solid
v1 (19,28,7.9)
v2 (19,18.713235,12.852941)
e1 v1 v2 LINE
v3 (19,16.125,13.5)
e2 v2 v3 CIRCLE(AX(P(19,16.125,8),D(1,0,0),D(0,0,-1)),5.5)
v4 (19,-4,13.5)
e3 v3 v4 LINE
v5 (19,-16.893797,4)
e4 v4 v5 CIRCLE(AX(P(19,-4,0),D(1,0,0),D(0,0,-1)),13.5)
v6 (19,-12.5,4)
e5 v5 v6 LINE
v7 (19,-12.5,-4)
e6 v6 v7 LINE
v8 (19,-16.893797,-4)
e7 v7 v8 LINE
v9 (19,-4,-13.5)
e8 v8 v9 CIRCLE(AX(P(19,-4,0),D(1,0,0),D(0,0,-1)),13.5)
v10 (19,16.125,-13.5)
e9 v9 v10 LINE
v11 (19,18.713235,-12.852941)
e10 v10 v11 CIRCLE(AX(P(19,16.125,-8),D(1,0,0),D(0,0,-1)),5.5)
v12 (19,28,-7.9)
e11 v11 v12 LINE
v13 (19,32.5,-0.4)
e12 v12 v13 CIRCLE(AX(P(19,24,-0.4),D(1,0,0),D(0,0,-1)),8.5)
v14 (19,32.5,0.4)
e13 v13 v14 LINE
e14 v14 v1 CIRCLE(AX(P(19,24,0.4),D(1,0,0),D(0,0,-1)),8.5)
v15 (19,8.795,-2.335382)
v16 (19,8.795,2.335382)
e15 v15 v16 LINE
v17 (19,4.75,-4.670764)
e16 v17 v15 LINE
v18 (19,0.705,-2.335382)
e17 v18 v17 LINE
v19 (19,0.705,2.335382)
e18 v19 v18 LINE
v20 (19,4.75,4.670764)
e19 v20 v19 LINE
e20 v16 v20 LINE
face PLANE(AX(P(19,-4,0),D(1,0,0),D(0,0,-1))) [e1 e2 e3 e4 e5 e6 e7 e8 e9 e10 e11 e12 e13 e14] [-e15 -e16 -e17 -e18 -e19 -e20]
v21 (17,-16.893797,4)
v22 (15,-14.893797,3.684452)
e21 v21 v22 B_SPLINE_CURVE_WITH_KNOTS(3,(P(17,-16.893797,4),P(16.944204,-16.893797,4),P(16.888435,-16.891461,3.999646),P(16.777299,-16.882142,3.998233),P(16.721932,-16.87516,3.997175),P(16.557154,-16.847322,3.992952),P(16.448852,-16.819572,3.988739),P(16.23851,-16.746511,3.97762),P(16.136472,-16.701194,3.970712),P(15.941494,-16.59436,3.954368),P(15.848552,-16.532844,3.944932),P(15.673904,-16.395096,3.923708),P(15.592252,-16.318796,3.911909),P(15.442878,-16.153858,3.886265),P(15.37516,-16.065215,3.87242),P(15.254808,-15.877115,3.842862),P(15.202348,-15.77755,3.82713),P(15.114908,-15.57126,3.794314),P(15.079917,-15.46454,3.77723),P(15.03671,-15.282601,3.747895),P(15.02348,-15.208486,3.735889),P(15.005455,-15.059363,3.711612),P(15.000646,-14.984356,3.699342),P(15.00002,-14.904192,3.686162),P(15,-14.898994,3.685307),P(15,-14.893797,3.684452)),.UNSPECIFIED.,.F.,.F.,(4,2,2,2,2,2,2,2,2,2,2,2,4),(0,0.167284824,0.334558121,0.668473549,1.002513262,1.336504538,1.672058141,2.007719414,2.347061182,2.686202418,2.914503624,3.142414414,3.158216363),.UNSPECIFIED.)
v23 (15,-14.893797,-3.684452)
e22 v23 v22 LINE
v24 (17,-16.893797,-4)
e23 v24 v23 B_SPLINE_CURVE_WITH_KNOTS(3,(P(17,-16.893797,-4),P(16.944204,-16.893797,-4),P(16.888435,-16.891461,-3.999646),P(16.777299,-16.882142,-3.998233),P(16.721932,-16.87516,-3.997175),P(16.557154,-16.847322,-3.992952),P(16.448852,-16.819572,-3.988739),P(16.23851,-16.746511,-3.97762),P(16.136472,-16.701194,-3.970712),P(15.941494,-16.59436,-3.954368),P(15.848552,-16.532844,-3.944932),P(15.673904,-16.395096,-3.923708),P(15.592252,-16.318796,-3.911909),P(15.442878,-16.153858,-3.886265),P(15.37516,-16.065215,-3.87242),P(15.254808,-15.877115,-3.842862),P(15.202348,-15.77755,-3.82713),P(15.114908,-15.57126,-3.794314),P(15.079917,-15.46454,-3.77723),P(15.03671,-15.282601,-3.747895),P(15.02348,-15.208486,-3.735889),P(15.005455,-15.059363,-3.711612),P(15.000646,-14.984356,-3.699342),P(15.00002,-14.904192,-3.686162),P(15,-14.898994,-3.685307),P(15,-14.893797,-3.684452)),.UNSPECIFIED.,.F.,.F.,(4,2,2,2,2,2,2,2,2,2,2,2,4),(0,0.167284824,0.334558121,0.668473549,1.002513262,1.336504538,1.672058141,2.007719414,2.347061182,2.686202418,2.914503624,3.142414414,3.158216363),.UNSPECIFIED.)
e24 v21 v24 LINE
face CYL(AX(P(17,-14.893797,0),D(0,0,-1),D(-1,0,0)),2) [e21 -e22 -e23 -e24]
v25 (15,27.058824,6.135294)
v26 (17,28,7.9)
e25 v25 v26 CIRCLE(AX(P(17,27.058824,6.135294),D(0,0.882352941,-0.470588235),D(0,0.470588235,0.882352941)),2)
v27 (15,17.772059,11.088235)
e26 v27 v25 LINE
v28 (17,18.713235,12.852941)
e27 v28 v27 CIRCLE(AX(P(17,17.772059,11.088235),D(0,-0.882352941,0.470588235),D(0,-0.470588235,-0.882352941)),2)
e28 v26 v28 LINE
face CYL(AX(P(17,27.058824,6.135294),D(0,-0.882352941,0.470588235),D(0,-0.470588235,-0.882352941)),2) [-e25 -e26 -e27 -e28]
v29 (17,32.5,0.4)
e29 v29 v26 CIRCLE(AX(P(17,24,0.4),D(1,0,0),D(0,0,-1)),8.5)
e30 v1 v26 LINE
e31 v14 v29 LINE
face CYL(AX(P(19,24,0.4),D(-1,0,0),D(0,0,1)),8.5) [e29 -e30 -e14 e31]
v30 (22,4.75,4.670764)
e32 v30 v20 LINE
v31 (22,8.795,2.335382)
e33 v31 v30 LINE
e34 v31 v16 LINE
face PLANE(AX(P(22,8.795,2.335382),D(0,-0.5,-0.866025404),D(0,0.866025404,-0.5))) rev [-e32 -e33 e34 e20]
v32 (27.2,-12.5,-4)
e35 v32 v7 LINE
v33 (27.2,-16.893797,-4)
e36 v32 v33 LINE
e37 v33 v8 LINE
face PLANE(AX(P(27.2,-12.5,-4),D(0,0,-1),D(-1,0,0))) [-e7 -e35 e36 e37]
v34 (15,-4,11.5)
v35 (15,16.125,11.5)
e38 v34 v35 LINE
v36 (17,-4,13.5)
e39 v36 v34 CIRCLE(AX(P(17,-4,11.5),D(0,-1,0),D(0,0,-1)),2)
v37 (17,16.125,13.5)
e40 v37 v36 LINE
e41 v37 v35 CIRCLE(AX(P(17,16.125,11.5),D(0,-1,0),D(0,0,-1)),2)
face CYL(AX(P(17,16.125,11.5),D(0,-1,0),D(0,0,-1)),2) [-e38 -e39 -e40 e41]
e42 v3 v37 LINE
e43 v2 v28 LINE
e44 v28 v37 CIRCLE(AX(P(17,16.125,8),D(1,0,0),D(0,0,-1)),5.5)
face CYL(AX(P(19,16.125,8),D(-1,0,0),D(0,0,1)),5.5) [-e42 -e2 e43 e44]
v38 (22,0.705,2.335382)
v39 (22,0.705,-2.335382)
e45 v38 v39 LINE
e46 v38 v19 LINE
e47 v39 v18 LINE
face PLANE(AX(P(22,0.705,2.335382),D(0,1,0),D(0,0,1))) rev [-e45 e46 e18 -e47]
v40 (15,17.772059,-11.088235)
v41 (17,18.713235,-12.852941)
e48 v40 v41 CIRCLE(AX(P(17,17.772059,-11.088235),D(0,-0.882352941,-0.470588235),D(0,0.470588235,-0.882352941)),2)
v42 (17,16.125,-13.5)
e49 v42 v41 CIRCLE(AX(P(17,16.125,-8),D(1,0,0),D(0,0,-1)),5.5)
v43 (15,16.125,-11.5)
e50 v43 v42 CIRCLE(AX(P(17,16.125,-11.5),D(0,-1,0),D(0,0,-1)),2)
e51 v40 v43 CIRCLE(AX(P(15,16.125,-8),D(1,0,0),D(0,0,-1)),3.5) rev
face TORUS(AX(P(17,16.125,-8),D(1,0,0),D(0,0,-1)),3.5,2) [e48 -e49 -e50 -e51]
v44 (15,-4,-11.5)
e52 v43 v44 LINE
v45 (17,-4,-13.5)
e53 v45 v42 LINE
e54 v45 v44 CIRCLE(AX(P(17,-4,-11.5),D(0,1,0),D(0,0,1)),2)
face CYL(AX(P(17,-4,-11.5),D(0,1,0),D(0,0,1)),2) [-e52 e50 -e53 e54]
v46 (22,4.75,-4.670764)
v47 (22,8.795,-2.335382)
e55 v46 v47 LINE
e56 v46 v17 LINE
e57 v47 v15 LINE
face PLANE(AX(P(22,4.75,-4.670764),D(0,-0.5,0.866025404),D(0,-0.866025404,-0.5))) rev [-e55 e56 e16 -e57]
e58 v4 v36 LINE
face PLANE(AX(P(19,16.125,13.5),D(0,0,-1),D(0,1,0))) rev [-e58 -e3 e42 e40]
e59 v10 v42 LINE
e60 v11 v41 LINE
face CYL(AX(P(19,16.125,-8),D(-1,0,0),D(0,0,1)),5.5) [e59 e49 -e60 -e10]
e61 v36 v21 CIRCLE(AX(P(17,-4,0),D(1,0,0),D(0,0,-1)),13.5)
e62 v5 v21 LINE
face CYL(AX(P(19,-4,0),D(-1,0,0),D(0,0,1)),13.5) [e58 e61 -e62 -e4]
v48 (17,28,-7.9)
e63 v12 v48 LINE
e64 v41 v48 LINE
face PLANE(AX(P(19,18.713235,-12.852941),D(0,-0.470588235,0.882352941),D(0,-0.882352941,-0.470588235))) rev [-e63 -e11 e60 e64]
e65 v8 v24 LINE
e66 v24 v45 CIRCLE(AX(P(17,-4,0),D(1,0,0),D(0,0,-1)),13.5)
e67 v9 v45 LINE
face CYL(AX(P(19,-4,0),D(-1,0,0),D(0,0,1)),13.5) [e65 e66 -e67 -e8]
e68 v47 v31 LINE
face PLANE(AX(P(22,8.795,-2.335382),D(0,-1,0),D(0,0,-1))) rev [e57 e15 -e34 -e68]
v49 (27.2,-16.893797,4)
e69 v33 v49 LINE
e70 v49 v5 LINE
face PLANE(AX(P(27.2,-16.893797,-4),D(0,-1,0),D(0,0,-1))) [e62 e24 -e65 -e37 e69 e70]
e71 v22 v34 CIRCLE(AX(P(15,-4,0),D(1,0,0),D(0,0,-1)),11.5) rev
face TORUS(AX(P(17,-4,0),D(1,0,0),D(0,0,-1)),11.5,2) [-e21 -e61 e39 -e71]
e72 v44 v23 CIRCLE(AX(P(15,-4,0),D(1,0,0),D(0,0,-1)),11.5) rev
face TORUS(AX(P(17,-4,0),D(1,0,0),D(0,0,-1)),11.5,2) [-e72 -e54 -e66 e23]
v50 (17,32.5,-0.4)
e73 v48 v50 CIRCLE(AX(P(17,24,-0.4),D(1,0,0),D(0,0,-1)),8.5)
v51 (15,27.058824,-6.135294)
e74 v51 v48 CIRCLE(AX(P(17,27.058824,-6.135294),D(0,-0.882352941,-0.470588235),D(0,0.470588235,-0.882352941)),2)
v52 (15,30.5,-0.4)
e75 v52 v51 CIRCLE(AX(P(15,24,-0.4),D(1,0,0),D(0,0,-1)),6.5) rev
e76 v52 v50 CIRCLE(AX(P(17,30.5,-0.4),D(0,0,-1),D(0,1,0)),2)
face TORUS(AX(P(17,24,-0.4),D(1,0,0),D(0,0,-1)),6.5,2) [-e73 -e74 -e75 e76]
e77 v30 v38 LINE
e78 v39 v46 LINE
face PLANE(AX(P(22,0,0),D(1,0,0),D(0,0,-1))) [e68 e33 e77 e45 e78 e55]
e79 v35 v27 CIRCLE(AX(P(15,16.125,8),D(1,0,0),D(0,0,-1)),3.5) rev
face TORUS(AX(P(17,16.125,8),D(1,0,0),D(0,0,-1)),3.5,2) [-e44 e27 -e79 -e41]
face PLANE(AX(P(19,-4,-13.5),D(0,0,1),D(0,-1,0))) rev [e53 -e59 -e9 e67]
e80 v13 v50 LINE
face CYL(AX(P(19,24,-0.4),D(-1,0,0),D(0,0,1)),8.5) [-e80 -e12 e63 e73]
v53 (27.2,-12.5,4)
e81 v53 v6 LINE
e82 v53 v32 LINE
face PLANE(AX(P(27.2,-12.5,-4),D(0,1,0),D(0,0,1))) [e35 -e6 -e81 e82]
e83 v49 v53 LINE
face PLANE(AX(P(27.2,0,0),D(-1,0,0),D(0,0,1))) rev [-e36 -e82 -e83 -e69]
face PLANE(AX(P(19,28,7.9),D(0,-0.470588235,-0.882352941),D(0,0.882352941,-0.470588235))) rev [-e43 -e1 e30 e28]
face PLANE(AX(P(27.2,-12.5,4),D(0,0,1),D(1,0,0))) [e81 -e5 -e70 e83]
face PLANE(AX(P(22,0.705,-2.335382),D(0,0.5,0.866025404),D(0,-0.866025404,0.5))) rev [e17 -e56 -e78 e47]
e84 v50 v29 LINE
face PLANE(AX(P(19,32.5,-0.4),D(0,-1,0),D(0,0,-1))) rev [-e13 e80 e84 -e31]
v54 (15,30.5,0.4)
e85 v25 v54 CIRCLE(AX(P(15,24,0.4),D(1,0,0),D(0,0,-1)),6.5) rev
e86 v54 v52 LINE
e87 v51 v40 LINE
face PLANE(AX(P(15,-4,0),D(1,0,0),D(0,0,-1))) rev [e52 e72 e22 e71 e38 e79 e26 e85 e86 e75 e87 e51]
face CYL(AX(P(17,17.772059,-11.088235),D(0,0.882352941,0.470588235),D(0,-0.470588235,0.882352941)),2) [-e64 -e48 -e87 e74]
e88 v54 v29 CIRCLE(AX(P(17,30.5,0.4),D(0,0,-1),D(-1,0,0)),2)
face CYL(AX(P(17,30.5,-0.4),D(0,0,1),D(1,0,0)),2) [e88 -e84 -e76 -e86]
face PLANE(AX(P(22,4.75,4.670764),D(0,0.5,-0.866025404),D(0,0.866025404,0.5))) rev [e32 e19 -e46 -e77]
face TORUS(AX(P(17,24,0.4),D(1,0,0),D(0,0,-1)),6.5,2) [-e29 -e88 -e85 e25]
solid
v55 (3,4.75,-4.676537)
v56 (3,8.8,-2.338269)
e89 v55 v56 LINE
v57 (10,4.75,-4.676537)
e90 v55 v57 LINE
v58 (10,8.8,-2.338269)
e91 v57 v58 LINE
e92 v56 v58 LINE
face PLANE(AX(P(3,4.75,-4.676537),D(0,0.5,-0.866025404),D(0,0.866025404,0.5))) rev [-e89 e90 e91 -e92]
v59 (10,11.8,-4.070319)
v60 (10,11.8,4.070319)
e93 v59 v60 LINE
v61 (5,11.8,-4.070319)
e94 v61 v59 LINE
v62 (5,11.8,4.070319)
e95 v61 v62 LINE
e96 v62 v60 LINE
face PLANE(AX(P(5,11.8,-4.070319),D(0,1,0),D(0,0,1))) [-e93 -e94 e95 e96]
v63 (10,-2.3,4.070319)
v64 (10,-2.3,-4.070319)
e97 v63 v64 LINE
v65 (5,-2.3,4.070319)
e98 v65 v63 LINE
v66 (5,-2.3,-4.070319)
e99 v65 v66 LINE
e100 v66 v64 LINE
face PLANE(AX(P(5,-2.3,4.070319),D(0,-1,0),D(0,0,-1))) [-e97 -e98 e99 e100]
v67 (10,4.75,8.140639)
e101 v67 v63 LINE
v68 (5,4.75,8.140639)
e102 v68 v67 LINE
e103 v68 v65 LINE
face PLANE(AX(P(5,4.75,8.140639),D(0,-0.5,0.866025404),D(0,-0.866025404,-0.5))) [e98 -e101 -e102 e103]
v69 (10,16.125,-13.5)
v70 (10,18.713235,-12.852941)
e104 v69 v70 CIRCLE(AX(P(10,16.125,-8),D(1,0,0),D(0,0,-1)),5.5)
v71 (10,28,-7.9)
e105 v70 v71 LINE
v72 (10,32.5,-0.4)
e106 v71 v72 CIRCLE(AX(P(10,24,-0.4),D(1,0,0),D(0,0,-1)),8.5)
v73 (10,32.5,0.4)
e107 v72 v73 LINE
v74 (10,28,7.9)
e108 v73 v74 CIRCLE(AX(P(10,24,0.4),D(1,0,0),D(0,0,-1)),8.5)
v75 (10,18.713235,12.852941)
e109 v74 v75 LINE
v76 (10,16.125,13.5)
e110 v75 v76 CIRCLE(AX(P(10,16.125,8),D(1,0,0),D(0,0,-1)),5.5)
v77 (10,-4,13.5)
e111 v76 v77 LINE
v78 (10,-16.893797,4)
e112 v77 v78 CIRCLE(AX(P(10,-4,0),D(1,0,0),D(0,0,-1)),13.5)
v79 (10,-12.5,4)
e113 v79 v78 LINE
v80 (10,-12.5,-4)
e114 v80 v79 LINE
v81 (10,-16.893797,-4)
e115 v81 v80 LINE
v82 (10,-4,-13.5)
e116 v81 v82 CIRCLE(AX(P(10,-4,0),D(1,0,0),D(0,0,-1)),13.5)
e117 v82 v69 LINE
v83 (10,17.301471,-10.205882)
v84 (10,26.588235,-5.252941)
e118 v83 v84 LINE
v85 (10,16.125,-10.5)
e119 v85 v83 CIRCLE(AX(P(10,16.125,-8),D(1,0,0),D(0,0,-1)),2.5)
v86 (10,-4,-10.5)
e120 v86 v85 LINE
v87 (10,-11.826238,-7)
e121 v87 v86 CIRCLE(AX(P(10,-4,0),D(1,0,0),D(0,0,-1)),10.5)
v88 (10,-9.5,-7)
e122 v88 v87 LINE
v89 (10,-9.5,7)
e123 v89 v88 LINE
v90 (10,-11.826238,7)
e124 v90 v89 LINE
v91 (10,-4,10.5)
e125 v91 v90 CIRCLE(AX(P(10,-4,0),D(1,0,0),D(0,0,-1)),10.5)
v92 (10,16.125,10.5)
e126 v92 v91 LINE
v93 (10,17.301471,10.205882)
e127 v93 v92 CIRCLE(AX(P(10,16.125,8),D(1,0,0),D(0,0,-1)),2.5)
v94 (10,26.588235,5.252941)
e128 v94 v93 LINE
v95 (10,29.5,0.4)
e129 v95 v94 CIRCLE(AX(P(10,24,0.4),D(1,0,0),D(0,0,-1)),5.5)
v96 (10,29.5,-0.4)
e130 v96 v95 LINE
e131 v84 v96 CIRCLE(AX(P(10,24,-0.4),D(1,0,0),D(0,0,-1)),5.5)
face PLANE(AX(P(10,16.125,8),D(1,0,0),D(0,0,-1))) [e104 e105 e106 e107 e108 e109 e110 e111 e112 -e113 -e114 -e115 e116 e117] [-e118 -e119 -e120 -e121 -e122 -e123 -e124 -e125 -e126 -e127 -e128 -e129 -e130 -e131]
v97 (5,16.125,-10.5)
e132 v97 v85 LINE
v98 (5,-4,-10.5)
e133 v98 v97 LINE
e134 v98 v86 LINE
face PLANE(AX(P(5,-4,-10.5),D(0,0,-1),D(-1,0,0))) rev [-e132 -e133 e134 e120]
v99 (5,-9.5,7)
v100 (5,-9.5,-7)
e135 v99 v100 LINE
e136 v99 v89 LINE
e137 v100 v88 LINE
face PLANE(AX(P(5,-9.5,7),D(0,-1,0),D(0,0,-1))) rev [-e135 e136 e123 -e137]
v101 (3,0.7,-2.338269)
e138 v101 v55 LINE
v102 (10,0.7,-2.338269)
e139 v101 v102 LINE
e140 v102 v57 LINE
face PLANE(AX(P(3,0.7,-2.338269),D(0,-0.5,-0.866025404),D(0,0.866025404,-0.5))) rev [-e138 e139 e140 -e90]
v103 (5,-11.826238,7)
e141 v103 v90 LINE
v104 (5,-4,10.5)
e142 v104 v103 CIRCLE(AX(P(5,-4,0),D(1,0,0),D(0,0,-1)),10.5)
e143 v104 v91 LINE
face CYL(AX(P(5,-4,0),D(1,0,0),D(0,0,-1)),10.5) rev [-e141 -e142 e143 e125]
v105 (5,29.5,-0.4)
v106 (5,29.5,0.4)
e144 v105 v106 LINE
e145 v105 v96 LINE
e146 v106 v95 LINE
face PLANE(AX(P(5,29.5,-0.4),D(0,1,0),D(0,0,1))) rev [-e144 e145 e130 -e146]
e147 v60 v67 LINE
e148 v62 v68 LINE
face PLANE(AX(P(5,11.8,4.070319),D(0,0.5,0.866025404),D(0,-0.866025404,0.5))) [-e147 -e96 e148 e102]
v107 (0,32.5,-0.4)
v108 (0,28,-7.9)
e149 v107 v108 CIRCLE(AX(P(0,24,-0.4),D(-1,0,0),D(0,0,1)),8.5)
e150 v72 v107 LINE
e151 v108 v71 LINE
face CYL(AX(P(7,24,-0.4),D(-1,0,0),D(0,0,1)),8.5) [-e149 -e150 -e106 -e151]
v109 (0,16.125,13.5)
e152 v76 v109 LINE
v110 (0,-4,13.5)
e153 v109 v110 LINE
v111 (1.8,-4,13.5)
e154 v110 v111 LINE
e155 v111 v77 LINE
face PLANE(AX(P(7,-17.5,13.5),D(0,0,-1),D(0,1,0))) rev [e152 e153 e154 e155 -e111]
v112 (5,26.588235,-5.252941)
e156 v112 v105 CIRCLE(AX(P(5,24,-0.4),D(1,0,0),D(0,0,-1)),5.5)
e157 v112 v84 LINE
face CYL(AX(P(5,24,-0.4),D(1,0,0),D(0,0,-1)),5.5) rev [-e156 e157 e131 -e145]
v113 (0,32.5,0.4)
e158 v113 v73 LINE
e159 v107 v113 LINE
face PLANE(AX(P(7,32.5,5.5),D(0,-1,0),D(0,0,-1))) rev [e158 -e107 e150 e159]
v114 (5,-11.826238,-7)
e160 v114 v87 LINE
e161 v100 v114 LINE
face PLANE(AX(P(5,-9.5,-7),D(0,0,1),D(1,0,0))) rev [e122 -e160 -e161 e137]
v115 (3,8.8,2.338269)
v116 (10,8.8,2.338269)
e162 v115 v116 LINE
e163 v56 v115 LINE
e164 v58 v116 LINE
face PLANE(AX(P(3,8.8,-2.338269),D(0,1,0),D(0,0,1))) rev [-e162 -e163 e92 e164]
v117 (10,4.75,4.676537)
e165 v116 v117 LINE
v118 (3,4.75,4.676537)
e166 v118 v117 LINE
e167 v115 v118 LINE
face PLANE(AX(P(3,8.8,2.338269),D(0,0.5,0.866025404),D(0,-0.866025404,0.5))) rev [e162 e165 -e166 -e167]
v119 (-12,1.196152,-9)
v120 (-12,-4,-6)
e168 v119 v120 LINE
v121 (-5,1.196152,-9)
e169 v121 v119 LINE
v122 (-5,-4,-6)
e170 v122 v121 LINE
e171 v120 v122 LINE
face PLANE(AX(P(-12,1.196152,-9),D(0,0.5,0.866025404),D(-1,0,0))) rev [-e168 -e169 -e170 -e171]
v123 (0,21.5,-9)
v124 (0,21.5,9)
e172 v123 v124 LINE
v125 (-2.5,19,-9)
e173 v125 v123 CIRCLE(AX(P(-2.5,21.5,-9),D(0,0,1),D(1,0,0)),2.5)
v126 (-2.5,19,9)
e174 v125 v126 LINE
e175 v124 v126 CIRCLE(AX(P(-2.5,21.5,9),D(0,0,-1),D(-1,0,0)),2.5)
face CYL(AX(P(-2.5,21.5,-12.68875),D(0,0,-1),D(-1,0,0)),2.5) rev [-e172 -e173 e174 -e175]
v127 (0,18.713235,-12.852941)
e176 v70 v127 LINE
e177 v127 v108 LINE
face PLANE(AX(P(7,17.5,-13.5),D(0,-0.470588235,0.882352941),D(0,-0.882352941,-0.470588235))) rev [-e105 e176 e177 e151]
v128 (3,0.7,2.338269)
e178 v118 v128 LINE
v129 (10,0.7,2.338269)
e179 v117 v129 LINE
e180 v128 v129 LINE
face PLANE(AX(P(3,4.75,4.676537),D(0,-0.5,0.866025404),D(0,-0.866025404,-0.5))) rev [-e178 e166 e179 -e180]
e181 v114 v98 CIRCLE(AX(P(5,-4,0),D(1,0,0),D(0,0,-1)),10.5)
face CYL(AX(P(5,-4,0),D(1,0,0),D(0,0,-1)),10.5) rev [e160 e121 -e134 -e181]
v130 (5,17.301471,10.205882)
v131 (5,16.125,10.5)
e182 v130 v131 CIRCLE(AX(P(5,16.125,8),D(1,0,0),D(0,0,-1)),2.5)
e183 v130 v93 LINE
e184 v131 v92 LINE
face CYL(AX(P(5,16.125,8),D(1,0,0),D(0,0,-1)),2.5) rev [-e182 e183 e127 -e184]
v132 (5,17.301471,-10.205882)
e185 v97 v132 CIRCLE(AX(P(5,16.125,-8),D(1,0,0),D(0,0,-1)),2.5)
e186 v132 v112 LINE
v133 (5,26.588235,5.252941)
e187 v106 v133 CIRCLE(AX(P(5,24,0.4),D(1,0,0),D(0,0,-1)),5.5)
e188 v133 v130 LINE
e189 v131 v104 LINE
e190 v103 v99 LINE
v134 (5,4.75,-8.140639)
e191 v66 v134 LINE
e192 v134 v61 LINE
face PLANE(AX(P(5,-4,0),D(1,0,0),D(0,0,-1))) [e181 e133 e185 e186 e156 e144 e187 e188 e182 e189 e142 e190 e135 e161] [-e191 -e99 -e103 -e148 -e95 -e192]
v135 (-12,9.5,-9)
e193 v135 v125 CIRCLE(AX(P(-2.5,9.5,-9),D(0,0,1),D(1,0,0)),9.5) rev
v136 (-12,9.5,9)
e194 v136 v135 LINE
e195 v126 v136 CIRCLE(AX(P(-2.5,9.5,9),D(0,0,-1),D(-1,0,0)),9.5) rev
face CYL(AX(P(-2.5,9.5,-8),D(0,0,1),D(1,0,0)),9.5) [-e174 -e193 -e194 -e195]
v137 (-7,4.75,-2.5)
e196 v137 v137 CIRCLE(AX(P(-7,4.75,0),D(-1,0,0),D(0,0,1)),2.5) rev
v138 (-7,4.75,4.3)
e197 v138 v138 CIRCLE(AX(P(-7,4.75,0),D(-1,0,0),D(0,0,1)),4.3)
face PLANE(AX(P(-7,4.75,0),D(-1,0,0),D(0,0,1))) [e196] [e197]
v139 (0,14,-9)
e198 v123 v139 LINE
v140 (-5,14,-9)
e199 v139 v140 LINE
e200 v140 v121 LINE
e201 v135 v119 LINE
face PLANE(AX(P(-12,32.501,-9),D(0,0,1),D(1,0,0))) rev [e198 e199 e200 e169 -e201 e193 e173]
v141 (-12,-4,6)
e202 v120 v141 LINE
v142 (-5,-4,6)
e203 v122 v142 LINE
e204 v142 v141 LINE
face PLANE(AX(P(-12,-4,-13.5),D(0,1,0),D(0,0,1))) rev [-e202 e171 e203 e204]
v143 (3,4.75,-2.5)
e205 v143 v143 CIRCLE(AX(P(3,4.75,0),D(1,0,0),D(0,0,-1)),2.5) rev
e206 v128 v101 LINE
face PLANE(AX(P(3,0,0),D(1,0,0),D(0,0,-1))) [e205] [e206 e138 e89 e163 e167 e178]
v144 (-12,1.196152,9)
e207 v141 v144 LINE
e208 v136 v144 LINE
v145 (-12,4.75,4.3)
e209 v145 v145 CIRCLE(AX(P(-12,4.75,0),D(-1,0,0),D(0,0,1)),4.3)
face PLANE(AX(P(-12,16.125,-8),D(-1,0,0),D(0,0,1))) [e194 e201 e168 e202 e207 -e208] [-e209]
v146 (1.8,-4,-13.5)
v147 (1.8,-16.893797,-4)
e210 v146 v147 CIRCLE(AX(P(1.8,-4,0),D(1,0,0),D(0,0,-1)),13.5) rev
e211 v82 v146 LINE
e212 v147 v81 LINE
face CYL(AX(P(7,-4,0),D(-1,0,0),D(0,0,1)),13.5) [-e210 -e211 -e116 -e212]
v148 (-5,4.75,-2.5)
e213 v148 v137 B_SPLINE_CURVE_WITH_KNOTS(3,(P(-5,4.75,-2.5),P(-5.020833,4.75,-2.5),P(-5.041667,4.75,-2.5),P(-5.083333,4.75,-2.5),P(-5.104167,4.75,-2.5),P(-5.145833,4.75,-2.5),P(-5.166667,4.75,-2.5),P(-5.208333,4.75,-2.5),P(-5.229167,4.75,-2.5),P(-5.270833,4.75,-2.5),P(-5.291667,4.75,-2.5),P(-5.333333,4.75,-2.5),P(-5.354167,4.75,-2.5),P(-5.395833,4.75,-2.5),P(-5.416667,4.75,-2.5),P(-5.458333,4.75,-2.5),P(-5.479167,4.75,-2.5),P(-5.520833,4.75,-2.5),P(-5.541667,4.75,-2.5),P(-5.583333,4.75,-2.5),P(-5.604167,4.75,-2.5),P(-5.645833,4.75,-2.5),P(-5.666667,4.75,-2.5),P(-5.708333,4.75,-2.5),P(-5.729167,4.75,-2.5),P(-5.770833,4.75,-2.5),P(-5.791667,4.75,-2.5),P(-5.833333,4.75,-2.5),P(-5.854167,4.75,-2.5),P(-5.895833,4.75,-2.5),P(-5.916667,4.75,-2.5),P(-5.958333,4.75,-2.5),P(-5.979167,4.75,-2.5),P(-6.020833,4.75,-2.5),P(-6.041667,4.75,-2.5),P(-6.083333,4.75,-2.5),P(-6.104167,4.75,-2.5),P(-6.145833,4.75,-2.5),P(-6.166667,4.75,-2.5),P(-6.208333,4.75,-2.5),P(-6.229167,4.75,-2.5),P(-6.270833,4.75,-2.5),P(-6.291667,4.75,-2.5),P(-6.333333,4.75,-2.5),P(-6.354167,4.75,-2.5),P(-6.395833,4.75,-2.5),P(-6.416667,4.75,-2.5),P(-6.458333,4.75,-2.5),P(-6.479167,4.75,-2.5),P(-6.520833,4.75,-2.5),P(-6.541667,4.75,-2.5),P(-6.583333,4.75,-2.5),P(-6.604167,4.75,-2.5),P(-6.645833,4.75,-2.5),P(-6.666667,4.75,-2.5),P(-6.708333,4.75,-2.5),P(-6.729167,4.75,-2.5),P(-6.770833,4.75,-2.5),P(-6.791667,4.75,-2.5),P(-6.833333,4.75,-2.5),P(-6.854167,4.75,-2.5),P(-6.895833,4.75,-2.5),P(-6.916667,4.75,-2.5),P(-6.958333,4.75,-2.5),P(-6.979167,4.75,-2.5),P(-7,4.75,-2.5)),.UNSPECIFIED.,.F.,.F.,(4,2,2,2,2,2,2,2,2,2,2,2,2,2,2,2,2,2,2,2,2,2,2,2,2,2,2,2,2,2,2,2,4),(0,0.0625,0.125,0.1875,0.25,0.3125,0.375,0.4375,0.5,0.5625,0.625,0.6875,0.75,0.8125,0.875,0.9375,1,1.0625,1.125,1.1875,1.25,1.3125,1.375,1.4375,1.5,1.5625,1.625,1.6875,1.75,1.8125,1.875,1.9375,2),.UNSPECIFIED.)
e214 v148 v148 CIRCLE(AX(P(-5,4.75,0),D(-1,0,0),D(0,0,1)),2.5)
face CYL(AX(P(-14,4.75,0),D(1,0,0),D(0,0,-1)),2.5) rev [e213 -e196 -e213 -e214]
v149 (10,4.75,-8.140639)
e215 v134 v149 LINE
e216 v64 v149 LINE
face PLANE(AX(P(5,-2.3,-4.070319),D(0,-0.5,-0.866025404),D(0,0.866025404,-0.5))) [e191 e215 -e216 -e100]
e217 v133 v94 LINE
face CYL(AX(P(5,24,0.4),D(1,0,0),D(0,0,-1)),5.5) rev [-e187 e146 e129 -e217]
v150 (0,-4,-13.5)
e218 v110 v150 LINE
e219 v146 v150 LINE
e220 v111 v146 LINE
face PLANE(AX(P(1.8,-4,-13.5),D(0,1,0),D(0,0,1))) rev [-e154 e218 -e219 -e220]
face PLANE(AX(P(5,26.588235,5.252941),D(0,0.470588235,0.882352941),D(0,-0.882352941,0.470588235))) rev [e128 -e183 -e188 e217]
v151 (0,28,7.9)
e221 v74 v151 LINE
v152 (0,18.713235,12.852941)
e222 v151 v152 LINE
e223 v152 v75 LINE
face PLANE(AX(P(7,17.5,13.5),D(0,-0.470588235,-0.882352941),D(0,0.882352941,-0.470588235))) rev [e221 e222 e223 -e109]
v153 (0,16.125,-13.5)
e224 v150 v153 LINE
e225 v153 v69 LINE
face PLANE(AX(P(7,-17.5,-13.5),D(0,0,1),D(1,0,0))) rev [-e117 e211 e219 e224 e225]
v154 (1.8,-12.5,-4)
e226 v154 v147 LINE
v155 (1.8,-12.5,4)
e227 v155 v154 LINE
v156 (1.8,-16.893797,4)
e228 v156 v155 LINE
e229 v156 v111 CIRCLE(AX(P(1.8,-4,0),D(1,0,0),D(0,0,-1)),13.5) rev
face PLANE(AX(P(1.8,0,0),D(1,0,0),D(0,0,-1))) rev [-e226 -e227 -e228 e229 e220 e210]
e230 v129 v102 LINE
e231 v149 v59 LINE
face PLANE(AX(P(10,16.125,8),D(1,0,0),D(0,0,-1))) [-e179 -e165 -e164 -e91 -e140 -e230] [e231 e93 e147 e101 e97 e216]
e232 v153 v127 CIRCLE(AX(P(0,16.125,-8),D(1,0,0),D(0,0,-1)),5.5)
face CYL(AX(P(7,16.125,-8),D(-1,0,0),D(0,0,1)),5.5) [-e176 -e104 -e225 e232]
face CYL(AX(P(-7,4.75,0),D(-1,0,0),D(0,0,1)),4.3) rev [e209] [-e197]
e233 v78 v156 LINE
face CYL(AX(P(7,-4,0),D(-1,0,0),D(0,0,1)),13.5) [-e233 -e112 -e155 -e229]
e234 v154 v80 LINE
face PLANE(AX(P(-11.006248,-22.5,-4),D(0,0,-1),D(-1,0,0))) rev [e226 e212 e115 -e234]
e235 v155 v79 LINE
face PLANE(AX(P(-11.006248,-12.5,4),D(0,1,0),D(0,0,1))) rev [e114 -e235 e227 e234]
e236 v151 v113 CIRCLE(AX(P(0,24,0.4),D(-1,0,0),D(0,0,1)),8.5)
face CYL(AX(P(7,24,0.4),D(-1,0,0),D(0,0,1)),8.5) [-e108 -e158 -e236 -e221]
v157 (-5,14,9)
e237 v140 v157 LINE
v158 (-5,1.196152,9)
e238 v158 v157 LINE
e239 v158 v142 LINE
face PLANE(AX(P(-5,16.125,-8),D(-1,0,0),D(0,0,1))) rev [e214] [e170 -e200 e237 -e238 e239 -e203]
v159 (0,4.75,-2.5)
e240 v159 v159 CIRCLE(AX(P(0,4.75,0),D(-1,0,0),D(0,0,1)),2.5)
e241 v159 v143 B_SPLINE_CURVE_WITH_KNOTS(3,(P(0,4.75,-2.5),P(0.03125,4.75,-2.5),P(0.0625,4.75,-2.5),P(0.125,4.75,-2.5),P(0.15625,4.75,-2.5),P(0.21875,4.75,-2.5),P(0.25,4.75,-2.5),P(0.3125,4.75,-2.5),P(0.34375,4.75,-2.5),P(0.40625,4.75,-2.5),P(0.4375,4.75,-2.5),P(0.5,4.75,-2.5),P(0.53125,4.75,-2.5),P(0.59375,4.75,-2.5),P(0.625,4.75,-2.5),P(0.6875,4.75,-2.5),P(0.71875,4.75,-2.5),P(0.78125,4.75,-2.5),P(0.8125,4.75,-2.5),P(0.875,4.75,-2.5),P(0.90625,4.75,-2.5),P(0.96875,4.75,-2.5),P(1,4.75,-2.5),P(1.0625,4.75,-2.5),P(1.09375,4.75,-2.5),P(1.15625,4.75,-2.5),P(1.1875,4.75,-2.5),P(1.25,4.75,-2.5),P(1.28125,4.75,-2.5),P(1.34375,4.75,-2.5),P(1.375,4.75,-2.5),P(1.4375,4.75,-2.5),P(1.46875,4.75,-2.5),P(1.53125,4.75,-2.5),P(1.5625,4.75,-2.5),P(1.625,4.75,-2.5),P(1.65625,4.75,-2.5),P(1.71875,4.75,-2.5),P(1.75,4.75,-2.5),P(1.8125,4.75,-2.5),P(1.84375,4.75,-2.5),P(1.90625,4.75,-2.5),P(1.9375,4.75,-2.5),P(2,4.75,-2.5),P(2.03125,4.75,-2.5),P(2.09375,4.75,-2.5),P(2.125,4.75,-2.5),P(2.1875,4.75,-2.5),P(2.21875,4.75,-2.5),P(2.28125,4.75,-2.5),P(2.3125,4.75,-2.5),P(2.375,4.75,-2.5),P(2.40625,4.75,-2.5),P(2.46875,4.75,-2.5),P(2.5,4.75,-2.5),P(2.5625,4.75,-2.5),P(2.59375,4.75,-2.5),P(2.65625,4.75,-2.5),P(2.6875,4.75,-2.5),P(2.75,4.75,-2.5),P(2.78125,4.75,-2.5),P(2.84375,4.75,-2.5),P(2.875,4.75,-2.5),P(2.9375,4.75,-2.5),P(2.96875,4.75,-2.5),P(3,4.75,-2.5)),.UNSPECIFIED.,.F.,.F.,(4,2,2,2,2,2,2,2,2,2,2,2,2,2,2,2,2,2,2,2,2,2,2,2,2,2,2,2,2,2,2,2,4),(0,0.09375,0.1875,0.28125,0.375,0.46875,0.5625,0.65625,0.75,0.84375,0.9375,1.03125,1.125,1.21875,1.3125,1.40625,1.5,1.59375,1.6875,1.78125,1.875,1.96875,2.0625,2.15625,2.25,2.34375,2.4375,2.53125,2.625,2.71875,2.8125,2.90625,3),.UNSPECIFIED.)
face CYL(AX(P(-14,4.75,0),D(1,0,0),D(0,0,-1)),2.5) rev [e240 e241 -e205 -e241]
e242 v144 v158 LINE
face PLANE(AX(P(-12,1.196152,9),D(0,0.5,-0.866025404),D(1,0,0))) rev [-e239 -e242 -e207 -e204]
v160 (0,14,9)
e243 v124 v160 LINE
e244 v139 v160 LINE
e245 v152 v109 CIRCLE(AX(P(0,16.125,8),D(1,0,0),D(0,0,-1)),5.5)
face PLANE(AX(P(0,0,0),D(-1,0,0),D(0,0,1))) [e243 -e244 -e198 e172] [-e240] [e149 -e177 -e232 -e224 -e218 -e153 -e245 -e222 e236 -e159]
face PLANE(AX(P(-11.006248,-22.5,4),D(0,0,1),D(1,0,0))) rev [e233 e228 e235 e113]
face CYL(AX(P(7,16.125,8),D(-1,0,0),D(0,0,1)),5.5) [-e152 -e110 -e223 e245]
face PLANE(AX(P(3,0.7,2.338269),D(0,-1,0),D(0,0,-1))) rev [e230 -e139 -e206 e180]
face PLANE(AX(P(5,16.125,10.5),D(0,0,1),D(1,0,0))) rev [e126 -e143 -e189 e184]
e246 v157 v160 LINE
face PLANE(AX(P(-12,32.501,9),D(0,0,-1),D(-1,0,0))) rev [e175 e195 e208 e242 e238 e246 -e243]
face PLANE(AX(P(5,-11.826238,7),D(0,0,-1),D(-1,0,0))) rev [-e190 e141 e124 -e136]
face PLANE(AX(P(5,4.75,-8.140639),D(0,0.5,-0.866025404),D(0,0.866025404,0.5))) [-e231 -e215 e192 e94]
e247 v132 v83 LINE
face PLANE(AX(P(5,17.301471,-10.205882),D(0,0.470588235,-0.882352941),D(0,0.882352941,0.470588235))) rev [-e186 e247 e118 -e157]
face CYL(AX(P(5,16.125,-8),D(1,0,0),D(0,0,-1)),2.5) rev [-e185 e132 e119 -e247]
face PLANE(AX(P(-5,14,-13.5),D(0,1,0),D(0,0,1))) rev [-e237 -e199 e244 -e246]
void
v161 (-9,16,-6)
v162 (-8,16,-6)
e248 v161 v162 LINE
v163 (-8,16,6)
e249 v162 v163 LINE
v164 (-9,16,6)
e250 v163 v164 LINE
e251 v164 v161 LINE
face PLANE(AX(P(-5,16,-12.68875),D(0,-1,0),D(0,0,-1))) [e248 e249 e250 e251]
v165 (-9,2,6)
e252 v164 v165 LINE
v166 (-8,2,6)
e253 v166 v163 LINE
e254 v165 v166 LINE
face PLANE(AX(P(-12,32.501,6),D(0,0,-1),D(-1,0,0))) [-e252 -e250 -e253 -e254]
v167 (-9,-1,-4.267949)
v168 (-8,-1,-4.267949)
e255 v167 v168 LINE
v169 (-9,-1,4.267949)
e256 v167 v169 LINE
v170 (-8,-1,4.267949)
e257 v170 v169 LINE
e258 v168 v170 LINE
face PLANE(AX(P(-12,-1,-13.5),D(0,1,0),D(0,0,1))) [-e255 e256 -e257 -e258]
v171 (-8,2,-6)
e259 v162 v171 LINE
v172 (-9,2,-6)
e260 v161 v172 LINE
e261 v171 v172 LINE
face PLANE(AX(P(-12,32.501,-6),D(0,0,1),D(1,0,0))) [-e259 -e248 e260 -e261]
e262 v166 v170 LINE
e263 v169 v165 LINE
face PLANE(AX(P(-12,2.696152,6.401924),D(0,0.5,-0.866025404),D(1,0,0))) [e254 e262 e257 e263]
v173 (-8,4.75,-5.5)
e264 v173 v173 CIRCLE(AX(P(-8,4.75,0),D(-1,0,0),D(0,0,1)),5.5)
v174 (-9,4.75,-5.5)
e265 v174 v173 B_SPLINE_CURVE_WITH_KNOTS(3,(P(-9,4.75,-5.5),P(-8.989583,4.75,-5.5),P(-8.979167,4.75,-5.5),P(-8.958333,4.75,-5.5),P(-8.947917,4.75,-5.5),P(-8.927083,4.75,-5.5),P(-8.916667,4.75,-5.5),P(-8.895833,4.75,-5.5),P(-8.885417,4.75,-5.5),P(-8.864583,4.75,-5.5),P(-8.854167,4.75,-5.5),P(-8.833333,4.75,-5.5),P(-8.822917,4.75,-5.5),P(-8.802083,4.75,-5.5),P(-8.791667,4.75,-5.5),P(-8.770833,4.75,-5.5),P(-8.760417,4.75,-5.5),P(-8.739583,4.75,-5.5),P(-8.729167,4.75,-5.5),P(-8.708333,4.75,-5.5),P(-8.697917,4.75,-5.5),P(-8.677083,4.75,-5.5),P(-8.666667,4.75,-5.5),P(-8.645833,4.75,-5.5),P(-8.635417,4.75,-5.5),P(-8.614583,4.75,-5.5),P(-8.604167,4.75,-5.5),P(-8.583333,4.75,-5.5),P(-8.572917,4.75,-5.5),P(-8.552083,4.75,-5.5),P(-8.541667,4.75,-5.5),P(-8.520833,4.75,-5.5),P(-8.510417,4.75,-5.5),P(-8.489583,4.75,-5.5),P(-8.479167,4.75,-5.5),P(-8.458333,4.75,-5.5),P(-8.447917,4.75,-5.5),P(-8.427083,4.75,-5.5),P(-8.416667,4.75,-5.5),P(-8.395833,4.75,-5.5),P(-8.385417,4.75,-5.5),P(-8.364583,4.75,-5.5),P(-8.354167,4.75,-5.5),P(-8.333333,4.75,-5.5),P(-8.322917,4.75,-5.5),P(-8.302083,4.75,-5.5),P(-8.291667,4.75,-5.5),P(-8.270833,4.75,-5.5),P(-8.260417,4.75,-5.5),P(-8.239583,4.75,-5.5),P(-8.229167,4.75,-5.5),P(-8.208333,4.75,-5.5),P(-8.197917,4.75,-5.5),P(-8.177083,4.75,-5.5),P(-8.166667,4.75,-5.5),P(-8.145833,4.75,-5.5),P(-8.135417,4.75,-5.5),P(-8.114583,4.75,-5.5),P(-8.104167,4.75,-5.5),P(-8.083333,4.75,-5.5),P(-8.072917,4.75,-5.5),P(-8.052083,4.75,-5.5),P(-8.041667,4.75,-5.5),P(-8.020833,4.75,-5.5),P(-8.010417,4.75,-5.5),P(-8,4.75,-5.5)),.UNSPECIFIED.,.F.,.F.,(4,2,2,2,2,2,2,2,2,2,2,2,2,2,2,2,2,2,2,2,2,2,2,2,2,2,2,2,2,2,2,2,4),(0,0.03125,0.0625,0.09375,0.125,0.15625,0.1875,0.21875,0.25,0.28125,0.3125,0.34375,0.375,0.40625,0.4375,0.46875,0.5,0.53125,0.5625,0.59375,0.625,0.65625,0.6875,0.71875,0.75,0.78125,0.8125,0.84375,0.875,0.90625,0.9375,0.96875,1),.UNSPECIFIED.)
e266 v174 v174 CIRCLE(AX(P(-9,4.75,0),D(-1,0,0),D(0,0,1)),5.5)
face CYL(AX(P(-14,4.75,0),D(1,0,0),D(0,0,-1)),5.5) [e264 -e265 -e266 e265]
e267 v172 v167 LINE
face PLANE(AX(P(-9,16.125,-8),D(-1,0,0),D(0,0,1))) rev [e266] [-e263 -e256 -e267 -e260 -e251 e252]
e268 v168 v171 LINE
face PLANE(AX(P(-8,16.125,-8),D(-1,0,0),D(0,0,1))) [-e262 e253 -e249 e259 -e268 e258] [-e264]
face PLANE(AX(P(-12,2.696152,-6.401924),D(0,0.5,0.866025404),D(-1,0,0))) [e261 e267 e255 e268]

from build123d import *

# Parameters (mm, degrees)
BOSS_EXTRUDE1_DEPTH = 7
FILLET1_R           = 8.5
FILLET2_R           = 5.5
FILLET3_R           = 13.5
SKETCH3_W           = 27
SKETCH3_H           = 13.5
CUT_EXTRUDE1_DEPTH  = 1.8
BOSS_EXTRUDE2_DEPTH = 5
BOSS_EXTRUDE3_DEPTH = 7
SKETCH10_R          = 2.5
CUT_EXTRUDE3_DEPTH  = 21
CUT_EXTRUDE16_REACH = 42.725
SKETCH19_W          = 12
SKETCH19_H          = 4.5
CHAMFER5_SIZE       = 3
CHAMFER5_SIZE2      = 5.196152423
CUT_EXTRUDE17_DEPTH = 4
SHELL1_START        = -9
SHELL1_OUTLINE_R    = 5.5
SHELL1_DEPTH        = 1
SKETCH21_R          = 4.3
CUT_EXTRUDE18_DEPTH = 5
FILLET5_R           = 9.5
FILLET6_R           = 2.5
BOSS_EXTRUDE5_START = 3
BOSS_EXTRUDE5_DEPTH = 3
SKETCH24_W          = 8
SKETCH24_H          = 10
CUT_EXTRUDE19_DEPTH = 8.2
CUT_EXTRUDE20_DEPTH = 5
BOSS_EXTRUDE6_DEPTH = 4
SKETCH27_W          = 8
SKETCH27_H          = 4.393796958
BOSS_EXTRUDE8_DEPTH = 12.2
BOSS_EXTRUDE9_DEPTH = 3
FILLET8_R           = 2


# Read off the part's stored shape, not the designer's step: Shell1
# Some blends are built 0.0001 mm under size
with BuildPart() as part:
    # Sketch2 → Boss-Extrude1 (new body)
    with BuildSketch(Plane(origin=(0, 0, 0), x_dir=(0, 0, -1), z_dir=(1, 0, 0))):
        Polygon((-13.5, -17.5), (13.5, -17.5), (13.5, 17.5), (5.5, 32.5), (-5.5, 32.5), (-13.5, 17.5), align=None)
    extrude(amount=BOSS_EXTRUDE1_DEPTH)

    # Fillet1
    fillet1_edges = [part.edges().sort_by_distance(p)[0] for p in [
        (3.5, 32.5, 5.5),
        (3.5, 32.5, -5.5),
    ]]
    fillet(fillet1_edges, radius=FILLET1_R)

    # Fillet2
    fillet2_edges = [part.edges().sort_by_distance(p)[0] for p in [
        (3.5, 17.5, -13.5),
        (3.5, 17.5, 13.5),
    ]]
    fillet(fillet2_edges, radius=FILLET2_R)

    # Fillet3
    fillet3_edges = [part.edges().sort_by_distance(p)[0] for p in [
        (3.5, -17.5, 13.5),
        (3.5, -17.5, -13.5),
    ]]
    fillet(fillet3_edges, radius=FILLET3_R - 0.0001)  # a hair under: the kernel refuses the full size

    # Sketch3 → Cut-Extrude1 (cut)
    with BuildSketch(Plane.ZY):
        with Locations((0, -10.75)):
            Rectangle(SKETCH3_W, SKETCH3_H)
    extrude(amount=-CUT_EXTRUDE1_DEPTH, mode=Mode.SUBTRACT)

    # Sketch6 → Boss-Extrude2 (add)
    with BuildSketch(Plane.ZY):
        with BuildLine():
            Line((-13.5, 14), (13.5, 14))
            Line((13.5, 14), (13.5, 16.125))
            ThreePointArc((13.5, 16.125), (13.293303509, 17.618632471), (12.688749833, 19))
            Line((12.688749833, 19), (-12.688749833, 19))
            ThreePointArc((-12.688749833, 19), (-13.293303509, 17.618632471), (-13.5, 16.125))
            Line((-13.5, 16.125), (-13.5, 14))
        make_face()
    extrude(amount=BOSS_EXTRUDE2_DEPTH)

    # Sketch9 → Boss-Extrude3 (add)
    with BuildSketch(Plane.ZY.offset(5)):
        with BuildLine():
            Line((-13.5, 14), (-13.5, -4))
            Line((-13.5, -4), (13.5, -4))
            Line((13.5, -4), (13.5, 14))
            Line((13.5, 14), (13.5, 16.125))
            ThreePointArc((13.5, 16.125), (13.293303509, 17.618632471), (12.688749833, 19))
            Line((12.688749833, 19), (-12.688749833, 19))
            ThreePointArc((-12.688749833, 19), (-13.293303509, 17.618632471), (-13.5, 16.125))
            Line((-13.5, 16.125), (-13.5, 14))
        make_face()
    extrude(amount=BOSS_EXTRUDE3_DEPTH)

    # Sketch10 → Cut-Extrude3 (cut)
    with BuildSketch(Plane(origin=(7, 0, 0), x_dir=(0, 0, -1), z_dir=(1, 0, 0))):
        with Locations((0, 4.75)):
            Circle(SKETCH10_R)
    extrude(amount=-CUT_EXTRUDE3_DEPTH, mode=Mode.SUBTRACT)

    # Sketch19 → Cut-Extrude16 (cut, up to next)
    with BuildSketch(Plane.XZ.offset(4), mode=Mode.PRIVATE) as cut_extrude16_sk1:
        with Locations((-6, -11.25)):
            Rectangle(SKETCH19_W, SKETCH19_H)
    cut_extrude16_tool1 = extrude(cut_extrude16_sk1.sketch, amount=-CUT_EXTRUDE16_REACH, mode=Mode.PRIVATE) & part.part
    # Sketch19 → Cut-Extrude16 (cut, up to next)
    with BuildSketch(Plane.XZ.offset(4), mode=Mode.PRIVATE) as cut_extrude16_sk2:
        with Locations((-6, 11.25)):
            Rectangle(SKETCH19_W, SKETCH19_H)
    cut_extrude16_tool2 = extrude(cut_extrude16_sk2.sketch, amount=-CUT_EXTRUDE16_REACH, mode=Mode.PRIVATE) & part.part
    add(cut_extrude16_tool1.solids().sort_by_distance((-6, -4, -11.25))[0], mode=Mode.SUBTRACT)
    add(cut_extrude16_tool2.solids().sort_by_distance((-6, -4, 11.25))[0], mode=Mode.SUBTRACT)

    # Chamfer5
    chamfer5_edges = [part.edges().sort_by_distance(p)[0] for p in [
        (-8.5, -4, -9),
        (-8.5, -4, 9),
    ]]
    chamfer5_side = [part.faces().sort_by_distance(p)[0] for p in [
        (-8.5, -4, 0),
    ]]
    chamfer(chamfer5_edges, length=CHAMFER5_SIZE, length2=CHAMFER5_SIZE2, reference=chamfer5_side[0])

    # Sketch20 → Cut-Extrude17 (cut)
    with BuildSketch(Plane(origin=(7, 0, 0), x_dir=(0, 0, -1), z_dir=(1, 0, 0))):
        Polygon((2.33826859, 8.8), (-2.33826859, 8.8), (-4.67653718, 4.75), (-2.33826859, 0.7), (2.33826859, 0.7), (4.67653718, 4.75), align=None)
    extrude(amount=-CUT_EXTRUDE17_DEPTH, mode=Mode.SUBTRACT)

    # Shell1 outline → Shell1 (cut)
    with BuildSketch(Plane.YZ.offset(SHELL1_START)):
        Polygon((16, -6), (16, 6), (2, 6), (-1, 4.267949192), (-1, -4.267949192), (2, -6), align=None)
        with Locations((4.75, 0)):
            Circle(SHELL1_OUTLINE_R, mode=Mode.SUBTRACT)
    extrude(amount=SHELL1_DEPTH, mode=Mode.SUBTRACT)

    # Sketch21 → Cut-Extrude18 (cut)
    with BuildSketch(Plane.ZY.offset(12)):
        with Locations((0, 4.75)):
            Circle(SKETCH21_R)
    extrude(amount=-CUT_EXTRUDE18_DEPTH, mode=Mode.SUBTRACT)

    # Fillet5
    fillet5_edges = [part.edges().sort_by_distance(p)[0] for p in [
        (-12, 19, 0),
    ]]
    fillet(fillet5_edges, radius=FILLET5_R)

    # Fillet6
    fillet6_edges = [part.edges().sort_by_distance(p)[0] for p in [
        (0, 19, 0),
    ]]
    fillet(fillet6_edges, radius=FILLET6_R - 0.0001)  # a hair under: the kernel refuses the full size

    # Sketch23 → Boss-Extrude5 (add)
    with BuildSketch(Plane(origin=(7, 0, 0), x_dir=(0, 0, -1), z_dir=(1, 0, 0)).offset(BOSS_EXTRUDE5_START)):
        with BuildLine():
            Line((-13.5, 16.125), (-13.5, -4))
            ThreePointArc((-13.5, -4), (-9.545941546, -13.545941546), (0, -17.5))
            ThreePointArc((0, -17.5), (9.545941546, -13.545941546), (13.5, -4))
            Line((13.5, -4), (13.5, 16.125))
            ThreePointArc((13.5, 16.125), (13.335783751, 17.458945938), (12.852941176, 18.713235294))
            Line((12.852941176, 18.713235294), (7.9, 28))
            ThreePointArc((7.9, 28), (4.773213921, 31.288689869), (0.4, 32.5))
            Line((0.4, 32.5), (-0.4, 32.5))
            ThreePointArc((-0.4, 32.5), (-4.773213921, 31.288689869), (-7.9, 28))
            Line((-7.9, 28), (-12.852941176, 18.713235294))
            ThreePointArc((-12.852941176, 18.713235294), (-13.335783751, 17.458945938), (-13.5, 16.125))
        make_face()
        Polygon((-4.67653718, 4.75), (-2.33826859, 0.7), (2.33826859, 0.7), (4.67653718, 4.75), (2.33826859, 8.8), (-2.33826859, 8.8), align=None, mode=Mode.SUBTRACT)
    extrude(amount=-BOSS_EXTRUDE5_DEPTH)

    # Sketch24 → Cut-Extrude19 (cut)
    with BuildSketch(Plane(origin=(10, 0, 0), x_dir=(0, 0, -1), z_dir=(1, 0, 0))):
        with Locations((0, -17.5)):
            Rectangle(SKETCH24_W, SKETCH24_H)
    extrude(amount=-CUT_EXTRUDE19_DEPTH, mode=Mode.SUBTRACT)

    # Sketch25 → Cut-Extrude20 (cut)
    with BuildSketch(Plane(origin=(10, 0, 0), x_dir=(0, 0, -1), z_dir=(1, 0, 0))):
        with BuildLine():
            Line((7, -9.5), (7, -11.826237921))
            ThreePointArc((7, -11.826237921), (9.585144756, -8.28660705), (10.5, -4))
            Line((10.5, -4), (10.5, 16.125))
            ThreePointArc((10.5, 16.125), (10.42535625, 16.731339063), (10.205882353, 17.301470588))
            Line((10.205882353, 17.301470588), (5.252941176, 26.588235294))
            ThreePointArc((5.252941176, 26.588235294), (3.229726655, 28.716211091), (0.4, 29.5))
            Line((0.4, 29.5), (-0.4, 29.5))
            ThreePointArc((-0.4, 29.5), (-3.229726655, 28.716211091), (-5.252941176, 26.588235294))
            Line((-5.252941176, 26.588235294), (-10.205882353, 17.301470588))
            ThreePointArc((-10.205882353, 17.301470588), (-10.42535625, 16.731339063), (-10.5, 16.125))
            Line((-10.5, 16.125), (-10.5, -4))
            ThreePointArc((-10.5, -4), (-9.585144756, -8.28660705), (-7, -11.826237921))
            Line((-7, -11.826237921), (-7, -9.5))
            Line((-7, -9.5), (7, -9.5))
        make_face()
        Polygon((4.070319398, 11.8), (-4.070319398, 11.8), (-8.140638796, 4.75), (-4.070319398, -2.3), (4.070319398, -2.3), (8.140638796, 4.75), align=None, mode=Mode.SUBTRACT)
    extrude(amount=-CUT_EXTRUDE20_DEPTH, mode=Mode.SUBTRACT)


with BuildPart() as body_2:
    # Sketch26 → Boss-Extrude6 (new body)
    with BuildSketch(Plane(origin=(15, 0, 0), x_dir=(0, 0, -1), z_dir=(1, 0, 0))):
        with BuildLine():
            Line((4, -12.5), (4, -16.893796958))
            ThreePointArc((4, -16.893796958), (10.86853256, -12.007808689), (13.5, -4))
            Line((13.5, -4), (13.5, 16.125))
            ThreePointArc((13.5, 16.125), (13.335783751, 17.458945938), (12.852941176, 18.713235294))
            Line((12.852941176, 18.713235294), (7.9, 28))
            ThreePointArc((7.9, 28), (4.773213921, 31.288689869), (0.4, 32.5))
            Line((0.4, 32.5), (-0.4, 32.5))
            ThreePointArc((-0.4, 32.5), (-4.773213921, 31.288689869), (-7.9, 28))
            Line((-7.9, 28), (-12.852941176, 18.713235294))
            ThreePointArc((-12.852941176, 18.713235294), (-13.335783751, 17.458945938), (-13.5, 16.125))
            Line((-13.5, 16.125), (-13.5, -4))
            ThreePointArc((-13.5, -4), (-10.86853256, -12.007808689), (-4, -16.893796958))
            Line((-4, -16.893796958), (-4, -12.5))
            Line((-4, -12.5), (4, -12.5))
        make_face()
    extrude(amount=BOSS_EXTRUDE6_DEPTH)

    # Sketch27 → Boss-Extrude8 (add)
    with BuildSketch(Plane.ZY.offset(-15)):
        with Locations((0, -14.696898479)):
            Rectangle(SKETCH27_W, SKETCH27_H)
    extrude(amount=-BOSS_EXTRUDE8_DEPTH)

    # Sketch28 → Boss-Extrude9 (add)
    with BuildSketch(Plane(origin=(19, 0, 0), x_dir=(0, 0, -1), z_dir=(1, 0, 0))):
        Polygon((2.335381839, 8.795), (-2.335381839, 8.795), (-4.670763678, 4.75), (-2.335381839, 0.705), (2.335381839, 0.705), (4.670763678, 4.75), align=None)
    extrude(amount=BOSS_EXTRUDE9_DEPTH)

    # Fillet8
    # the kernel refuses this fillet: 2 mm, written as the material it takes off along each edge
    with BuildSketch(Plane(origin=(15, -4, 0), x_dir=(0, 0, 1), z_dir=(0, 1, 0))) as fillet8_piece_1:
        with BuildLine():
            CenterArc((13.5 - FILLET8_R, FILLET8_R), FILLET8_R, 270, 90)
            Line((13.5 - FILLET8_R, 0), (13.5, 0))
            Line((13.5, 0), (13.5, FILLET8_R))
        make_face()
    revolve(axis=Axis((15, -4, 0), (1, 0, 0)), revolution_arc=93.990945472, mode=Mode.SUBTRACT)
    with BuildSketch(Plane(origin=(15, 16.125, 13.5), x_dir=(1, 0, 0), z_dir=(0, -1, 0))) as fillet8_piece_2:
        with BuildLine():
            CenterArc((FILLET8_R, -FILLET8_R), FILLET8_R, 90, 90)
            Line((0, -FILLET8_R), (0, 0))
            Line((0, 0), (FILLET8_R, 0))
        make_face()
    extrude(amount=20.125, mode=Mode.SUBTRACT)
    with BuildSketch(Plane(origin=(15, 16.125, 8), x_dir=(0, 0.47058823529411903, 0.8823529411764699), z_dir=(0, 0.8823529411764699, -0.47058823529411903))) as fillet8_piece_3:
        with BuildLine():
            CenterArc((5.5 - FILLET8_R, FILLET8_R), FILLET8_R, 270, 90)
            Line((5.5 - FILLET8_R, 0), (5.5, 0))
            Line((5.5, 0), (5.5, FILLET8_R))
        make_face()
    revolve(axis=Axis((15, 16.125, 8), (1, 0, 0)), revolution_arc=28.072486936, mode=Mode.SUBTRACT)
    with BuildSketch(Plane(origin=(15, 28, 7.9), x_dir=(0, -0.47058823529411736, -0.8823529411764708), z_dir=(0, -0.8823529411764708, 0.4705882352941174)), Plane(origin=(15, 18.713235294, -12.852941176), x_dir=(0, -0.4705882352941178, 0.8823529411764706), z_dir=(0, 0.8823529411764706, 0.47058823529411786))) as fillet8_piece_4:
        with BuildLine():
            CenterArc((FILLET8_R, FILLET8_R), FILLET8_R, 180, 90)
            Line((0, FILLET8_R), (0, 0))
            Line((0, 0), (FILLET8_R, 0))
        make_face()
    extrude(amount=10.525, mode=Mode.SUBTRACT)
    with BuildSketch(Plane(origin=(15, 24, 0.4), x_dir=(0, 1, 0), z_dir=(0, 0, -1))) as fillet8_piece_5:
        with BuildLine():
            CenterArc((8.5 - FILLET8_R, FILLET8_R), FILLET8_R, 270, 90)
            Line((8.5, FILLET8_R), (8.5, 0))
            Line((8.5, 0), (8.5 - FILLET8_R, 0))
        make_face()
    revolve(axis=Axis((15, 24, 0.4), (1, 0, 0)), revolution_arc=61.927513064, mode=Mode.SUBTRACT)
    with BuildSketch(Plane(origin=(15, 32.5, -0.4), x_dir=(0, -1, 0), z_dir=(0, 0, 1))) as fillet8_piece_6:
        with BuildLine():
            CenterArc((FILLET8_R, FILLET8_R), FILLET8_R, 180, 90)
            Line((0, FILLET8_R), (0, 0))
            Line((0, 0), (FILLET8_R, 0))
        make_face()
    extrude(amount=0.8, mode=Mode.SUBTRACT)
    with BuildSketch(Plane(origin=(15, 24, -0.4), x_dir=(0, 0.4705882352941177, -0.8823529411764706), z_dir=(0, -0.8823529411764706, -0.4705882352941177))) as fillet8_piece_7:
        with BuildLine():
            CenterArc((8.5 - FILLET8_R, FILLET8_R), FILLET8_R, 270, 90)
            Line((8.5, FILLET8_R), (8.5, 0))
            Line((8.5, 0), (8.5 - FILLET8_R, 0))
        make_face()
    revolve(axis=Axis((15, 24, -0.4), (1, 0, 0)), revolution_arc=61.927513064, mode=Mode.SUBTRACT)
    with BuildSketch(Plane(origin=(15, 16.125, -8), x_dir=(0, 0, -1), z_dir=(0, -1, 0))) as fillet8_piece_8:
        with BuildLine():
            CenterArc((5.5 - FILLET8_R, FILLET8_R), FILLET8_R, 270, 90)
            Line((5.5, FILLET8_R), (5.5, 0))
            Line((5.5, 0), (5.5 - FILLET8_R, 0))
        make_face()
    revolve(axis=Axis((15, 16.125, -8), (1, 0, 0)), revolution_arc=28.072486936, mode=Mode.SUBTRACT)
    with BuildSketch(Plane(origin=(15, -4, -13.5), x_dir=(0, 0, 1), z_dir=(0, 1, 0))) as fillet8_piece_9:
        with BuildLine():
            CenterArc((FILLET8_R, FILLET8_R), FILLET8_R, 180, 90)
            Line((0, FILLET8_R), (0, 0))
            Line((0, 0), (FILLET8_R, 0))
        make_face()
    extrude(amount=20.125, mode=Mode.SUBTRACT)
    with BuildSketch(Plane(origin=(15, -4, 0), x_dir=(0, -0.9975750615108255, 0.06959882651074423), z_dir=(0, 0.06959882651074423, 0.9975750615108255))) as fillet8_piece_10:
        with BuildLine():
            CenterArc((13.5 - FILLET8_R, FILLET8_R), FILLET8_R, 270, 90)
            Line((13.5, FILLET8_R), (13.5, 0))
            Line((13.5, 0), (13.5 - FILLET8_R, 0))
        make_face()
    revolve(axis=Axis((15, -4, 0), (1, 0, 0)), revolution_arc=93.990945472, mode=Mode.SUBTRACT)
    with BuildSketch(Plane(origin=(15, -16.893796958, 9), x_dir=(0, 1, 0), z_dir=(0, 0, -1))) as fillet8_piece_11:
        with BuildLine():
            CenterArc((FILLET8_R, FILLET8_R), FILLET8_R, 180, 90)
            Line((0, FILLET8_R), (0, 0))
            Line((0, 0), (FILLET8_R, 0))
        make_face()
    extrude(amount=18, mode=Mode.SUBTRACT)


solid = Compound([part.part, body_2.part])
